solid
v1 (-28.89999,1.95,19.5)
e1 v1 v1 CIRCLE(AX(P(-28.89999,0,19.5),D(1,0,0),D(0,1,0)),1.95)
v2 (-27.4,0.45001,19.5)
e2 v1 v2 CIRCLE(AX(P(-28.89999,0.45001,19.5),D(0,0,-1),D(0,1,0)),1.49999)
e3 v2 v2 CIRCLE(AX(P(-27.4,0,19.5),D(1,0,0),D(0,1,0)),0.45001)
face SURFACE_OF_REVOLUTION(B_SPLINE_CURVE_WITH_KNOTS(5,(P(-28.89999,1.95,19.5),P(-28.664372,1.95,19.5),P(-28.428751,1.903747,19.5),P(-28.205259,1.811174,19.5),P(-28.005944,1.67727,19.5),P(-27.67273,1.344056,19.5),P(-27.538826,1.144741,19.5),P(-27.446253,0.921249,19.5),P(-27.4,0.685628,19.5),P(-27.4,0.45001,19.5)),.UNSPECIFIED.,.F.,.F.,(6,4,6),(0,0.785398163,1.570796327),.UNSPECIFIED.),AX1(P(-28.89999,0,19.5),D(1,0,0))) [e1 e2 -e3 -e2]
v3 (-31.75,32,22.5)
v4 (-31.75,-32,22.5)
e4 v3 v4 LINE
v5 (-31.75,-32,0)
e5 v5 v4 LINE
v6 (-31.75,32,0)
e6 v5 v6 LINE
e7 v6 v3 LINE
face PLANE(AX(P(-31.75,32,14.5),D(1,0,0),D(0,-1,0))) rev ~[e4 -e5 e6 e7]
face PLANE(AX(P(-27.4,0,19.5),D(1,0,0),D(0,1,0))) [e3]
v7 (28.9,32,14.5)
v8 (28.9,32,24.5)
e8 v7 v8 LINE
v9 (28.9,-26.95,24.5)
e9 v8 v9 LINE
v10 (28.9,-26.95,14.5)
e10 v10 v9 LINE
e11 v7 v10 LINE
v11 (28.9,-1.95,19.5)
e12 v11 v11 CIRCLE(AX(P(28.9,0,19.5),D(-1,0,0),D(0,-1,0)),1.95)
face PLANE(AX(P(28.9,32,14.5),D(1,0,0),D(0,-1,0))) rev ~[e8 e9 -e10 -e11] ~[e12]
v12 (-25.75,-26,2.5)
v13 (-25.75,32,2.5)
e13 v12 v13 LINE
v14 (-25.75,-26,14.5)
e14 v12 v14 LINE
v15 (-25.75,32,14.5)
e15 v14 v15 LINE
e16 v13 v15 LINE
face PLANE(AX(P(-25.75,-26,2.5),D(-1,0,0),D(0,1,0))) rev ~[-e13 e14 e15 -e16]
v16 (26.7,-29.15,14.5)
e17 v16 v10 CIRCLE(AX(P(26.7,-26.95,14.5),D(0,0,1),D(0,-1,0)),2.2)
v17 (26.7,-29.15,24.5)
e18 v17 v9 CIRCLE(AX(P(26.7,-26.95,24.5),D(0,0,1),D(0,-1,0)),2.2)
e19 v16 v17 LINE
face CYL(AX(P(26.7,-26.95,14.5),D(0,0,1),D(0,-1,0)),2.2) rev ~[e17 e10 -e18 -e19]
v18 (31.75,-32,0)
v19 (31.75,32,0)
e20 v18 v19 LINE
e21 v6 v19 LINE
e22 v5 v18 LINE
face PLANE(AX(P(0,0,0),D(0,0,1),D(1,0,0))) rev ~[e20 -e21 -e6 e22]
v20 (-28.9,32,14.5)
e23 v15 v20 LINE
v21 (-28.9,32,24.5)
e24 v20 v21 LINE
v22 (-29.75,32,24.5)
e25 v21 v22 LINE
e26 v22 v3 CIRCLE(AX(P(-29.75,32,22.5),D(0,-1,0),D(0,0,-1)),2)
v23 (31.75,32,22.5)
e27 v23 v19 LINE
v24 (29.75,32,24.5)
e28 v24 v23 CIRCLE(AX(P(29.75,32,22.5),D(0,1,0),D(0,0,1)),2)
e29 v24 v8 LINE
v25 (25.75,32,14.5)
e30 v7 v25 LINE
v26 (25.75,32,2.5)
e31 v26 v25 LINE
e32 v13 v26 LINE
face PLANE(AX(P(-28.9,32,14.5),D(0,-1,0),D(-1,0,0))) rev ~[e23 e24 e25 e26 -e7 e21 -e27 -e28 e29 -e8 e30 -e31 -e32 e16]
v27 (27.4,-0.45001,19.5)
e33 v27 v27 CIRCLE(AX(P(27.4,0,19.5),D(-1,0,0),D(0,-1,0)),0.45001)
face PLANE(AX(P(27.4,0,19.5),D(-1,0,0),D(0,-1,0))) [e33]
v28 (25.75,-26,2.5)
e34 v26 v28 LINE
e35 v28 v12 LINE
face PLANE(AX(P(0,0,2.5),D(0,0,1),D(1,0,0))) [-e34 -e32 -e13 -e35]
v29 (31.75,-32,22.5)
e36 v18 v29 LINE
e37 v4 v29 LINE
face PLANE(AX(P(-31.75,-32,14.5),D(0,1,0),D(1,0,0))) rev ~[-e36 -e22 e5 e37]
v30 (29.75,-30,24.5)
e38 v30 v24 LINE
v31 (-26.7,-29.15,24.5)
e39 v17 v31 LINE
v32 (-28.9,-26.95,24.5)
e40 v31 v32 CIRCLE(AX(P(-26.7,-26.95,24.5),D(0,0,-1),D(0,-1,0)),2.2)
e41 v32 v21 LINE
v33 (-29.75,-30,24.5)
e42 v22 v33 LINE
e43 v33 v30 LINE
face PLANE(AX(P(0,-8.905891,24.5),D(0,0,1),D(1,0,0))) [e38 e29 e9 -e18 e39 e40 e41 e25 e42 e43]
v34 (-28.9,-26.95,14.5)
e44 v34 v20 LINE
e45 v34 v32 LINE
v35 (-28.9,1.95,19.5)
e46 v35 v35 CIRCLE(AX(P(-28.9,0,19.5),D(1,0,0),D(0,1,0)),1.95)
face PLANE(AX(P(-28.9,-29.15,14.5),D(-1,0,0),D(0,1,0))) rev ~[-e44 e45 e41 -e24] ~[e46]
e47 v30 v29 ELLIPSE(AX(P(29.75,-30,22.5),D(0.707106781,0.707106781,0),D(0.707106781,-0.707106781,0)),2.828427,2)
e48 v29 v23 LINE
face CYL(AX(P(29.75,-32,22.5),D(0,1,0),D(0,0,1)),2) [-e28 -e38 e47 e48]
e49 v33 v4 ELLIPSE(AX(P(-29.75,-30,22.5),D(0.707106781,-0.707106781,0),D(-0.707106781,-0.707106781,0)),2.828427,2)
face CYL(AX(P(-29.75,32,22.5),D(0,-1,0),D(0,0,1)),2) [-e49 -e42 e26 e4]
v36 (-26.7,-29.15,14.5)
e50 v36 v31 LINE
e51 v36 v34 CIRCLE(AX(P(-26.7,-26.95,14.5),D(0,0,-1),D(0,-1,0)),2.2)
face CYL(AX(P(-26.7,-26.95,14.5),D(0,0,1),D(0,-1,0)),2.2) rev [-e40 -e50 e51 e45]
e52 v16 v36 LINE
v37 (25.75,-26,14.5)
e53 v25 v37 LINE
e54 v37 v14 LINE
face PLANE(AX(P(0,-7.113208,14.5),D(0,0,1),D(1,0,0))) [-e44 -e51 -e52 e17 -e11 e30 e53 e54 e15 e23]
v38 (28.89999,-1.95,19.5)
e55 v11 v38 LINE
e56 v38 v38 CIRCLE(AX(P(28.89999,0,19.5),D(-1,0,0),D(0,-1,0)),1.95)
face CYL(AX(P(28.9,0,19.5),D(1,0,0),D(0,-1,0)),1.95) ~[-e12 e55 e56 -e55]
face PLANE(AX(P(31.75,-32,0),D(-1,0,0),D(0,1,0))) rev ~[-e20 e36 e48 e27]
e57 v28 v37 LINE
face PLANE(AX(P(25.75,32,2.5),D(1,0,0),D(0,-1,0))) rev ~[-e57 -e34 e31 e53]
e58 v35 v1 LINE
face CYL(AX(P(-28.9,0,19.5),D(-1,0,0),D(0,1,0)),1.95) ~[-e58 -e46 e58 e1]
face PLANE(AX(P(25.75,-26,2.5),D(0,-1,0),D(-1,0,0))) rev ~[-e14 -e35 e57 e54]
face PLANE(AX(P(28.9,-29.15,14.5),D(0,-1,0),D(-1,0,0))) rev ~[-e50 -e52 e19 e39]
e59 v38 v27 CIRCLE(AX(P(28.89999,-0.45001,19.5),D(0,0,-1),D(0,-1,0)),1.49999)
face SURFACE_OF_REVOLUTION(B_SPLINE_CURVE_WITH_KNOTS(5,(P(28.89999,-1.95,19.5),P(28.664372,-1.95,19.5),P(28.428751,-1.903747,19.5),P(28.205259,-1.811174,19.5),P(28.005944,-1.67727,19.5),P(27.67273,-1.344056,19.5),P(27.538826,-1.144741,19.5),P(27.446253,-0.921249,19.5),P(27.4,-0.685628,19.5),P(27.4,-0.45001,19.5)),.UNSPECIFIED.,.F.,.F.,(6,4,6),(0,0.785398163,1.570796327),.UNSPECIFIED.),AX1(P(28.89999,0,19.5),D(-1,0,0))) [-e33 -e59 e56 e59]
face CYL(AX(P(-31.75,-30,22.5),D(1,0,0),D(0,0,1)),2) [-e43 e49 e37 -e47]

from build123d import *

# Parameters (mm, degrees)
F0_W      = 63.5
F0_H      = 64
F1_DEPTH  = 2.5
F3_DEPTH  = 12
F5_DEPTH  = 10
F6_R      = 2.2
F7_R      = 2
F8_R      = 1.95
F9_DEPTH  = 1.5
F10_R     = 1.49999
F11_R     = 1.95
F12_DEPTH = 1.5
F13_R     = 1.49999


# Not quite as in the source:
# - a fillet or chamfer is up to 0.001 mm smaller than in the source, because OpenCascade refuses the exact size


with BuildPart() as f1:
    # F0 (on Top) → F1 (new body)
    with BuildSketch(Plane.XY):
        Rectangle(F0_W, F0_H)
    extrude(amount=F1_DEPTH)

    # F2 (on face) → F3 (join)
    with BuildSketch(Plane.XY.offset(2.5)):
        Polygon((-25.75, 32), (-31.75, 32), (-31.75, -32), (31.75, -32), (31.75, 32), (25.75, 32), (25.75, -26), (-25.75, -26), align=None)
    extrude(amount=F3_DEPTH)

    # F4 (on face) → F5 (join)
    with BuildSketch(Plane.XY.offset(14.5)):
        Polygon((-28.9, 32), (-31.75, 32), (-31.75, -32), (31.75, -32), (31.75, 32), (28.9, 32), (28.9, -29.15), (-28.9, -29.15), align=None)
    extrude(amount=F5_DEPTH)

    # F6
    f6_edges = [f1.edges().sort_by_distance(p)[0] for p in [
        (-28.9, -29.15, 19.5),
        (28.9, -29.15, 19.5),
    ]]
    fillet(f6_edges, radius=F6_R)

    # F7
    f7_edges = [f1.edges().sort_by_distance(p)[0] for p in [
        (-31.75, 0, 24.5),
        (0, -32, 24.5),
        (31.75, 0, 24.5),
    ]]
    fillet(f7_edges, radius=F7_R)

    # F8 (on face) → F9 (join)
    with BuildSketch(Plane.YZ.offset(-28.9)):
        with Locations((0, 19.5)):
            Circle(F8_R)
    extrude(amount=F9_DEPTH)

    # F10 (radius 1.5 in the source; OpenCascade refuses exactly that, so slightly less here)
    f10_edges = [f1.edges().sort_by_distance(p)[0] for p in [
        (-27.4, -1.95, 19.5),
    ]]
    fillet(f10_edges, radius=F10_R)

    # F11 (on face) → F12 (join)
    with BuildSketch(Plane(origin=(28.9, 0, 0), x_dir=(0, -1, 0), z_dir=(-1, 0, 0))):
        with Locations((0, 19.5)):
            Circle(F11_R)
    extrude(amount=F12_DEPTH)

    # F13 (radius 1.5 in the source; OpenCascade refuses exactly that, so slightly less here)
    f13_edges = [f1.edges().sort_by_distance(p)[0] for p in [
        (27.4, 1.95, 19.5),
    ]]
    fillet(f13_edges, radius=F13_R)


solid = f1.part
